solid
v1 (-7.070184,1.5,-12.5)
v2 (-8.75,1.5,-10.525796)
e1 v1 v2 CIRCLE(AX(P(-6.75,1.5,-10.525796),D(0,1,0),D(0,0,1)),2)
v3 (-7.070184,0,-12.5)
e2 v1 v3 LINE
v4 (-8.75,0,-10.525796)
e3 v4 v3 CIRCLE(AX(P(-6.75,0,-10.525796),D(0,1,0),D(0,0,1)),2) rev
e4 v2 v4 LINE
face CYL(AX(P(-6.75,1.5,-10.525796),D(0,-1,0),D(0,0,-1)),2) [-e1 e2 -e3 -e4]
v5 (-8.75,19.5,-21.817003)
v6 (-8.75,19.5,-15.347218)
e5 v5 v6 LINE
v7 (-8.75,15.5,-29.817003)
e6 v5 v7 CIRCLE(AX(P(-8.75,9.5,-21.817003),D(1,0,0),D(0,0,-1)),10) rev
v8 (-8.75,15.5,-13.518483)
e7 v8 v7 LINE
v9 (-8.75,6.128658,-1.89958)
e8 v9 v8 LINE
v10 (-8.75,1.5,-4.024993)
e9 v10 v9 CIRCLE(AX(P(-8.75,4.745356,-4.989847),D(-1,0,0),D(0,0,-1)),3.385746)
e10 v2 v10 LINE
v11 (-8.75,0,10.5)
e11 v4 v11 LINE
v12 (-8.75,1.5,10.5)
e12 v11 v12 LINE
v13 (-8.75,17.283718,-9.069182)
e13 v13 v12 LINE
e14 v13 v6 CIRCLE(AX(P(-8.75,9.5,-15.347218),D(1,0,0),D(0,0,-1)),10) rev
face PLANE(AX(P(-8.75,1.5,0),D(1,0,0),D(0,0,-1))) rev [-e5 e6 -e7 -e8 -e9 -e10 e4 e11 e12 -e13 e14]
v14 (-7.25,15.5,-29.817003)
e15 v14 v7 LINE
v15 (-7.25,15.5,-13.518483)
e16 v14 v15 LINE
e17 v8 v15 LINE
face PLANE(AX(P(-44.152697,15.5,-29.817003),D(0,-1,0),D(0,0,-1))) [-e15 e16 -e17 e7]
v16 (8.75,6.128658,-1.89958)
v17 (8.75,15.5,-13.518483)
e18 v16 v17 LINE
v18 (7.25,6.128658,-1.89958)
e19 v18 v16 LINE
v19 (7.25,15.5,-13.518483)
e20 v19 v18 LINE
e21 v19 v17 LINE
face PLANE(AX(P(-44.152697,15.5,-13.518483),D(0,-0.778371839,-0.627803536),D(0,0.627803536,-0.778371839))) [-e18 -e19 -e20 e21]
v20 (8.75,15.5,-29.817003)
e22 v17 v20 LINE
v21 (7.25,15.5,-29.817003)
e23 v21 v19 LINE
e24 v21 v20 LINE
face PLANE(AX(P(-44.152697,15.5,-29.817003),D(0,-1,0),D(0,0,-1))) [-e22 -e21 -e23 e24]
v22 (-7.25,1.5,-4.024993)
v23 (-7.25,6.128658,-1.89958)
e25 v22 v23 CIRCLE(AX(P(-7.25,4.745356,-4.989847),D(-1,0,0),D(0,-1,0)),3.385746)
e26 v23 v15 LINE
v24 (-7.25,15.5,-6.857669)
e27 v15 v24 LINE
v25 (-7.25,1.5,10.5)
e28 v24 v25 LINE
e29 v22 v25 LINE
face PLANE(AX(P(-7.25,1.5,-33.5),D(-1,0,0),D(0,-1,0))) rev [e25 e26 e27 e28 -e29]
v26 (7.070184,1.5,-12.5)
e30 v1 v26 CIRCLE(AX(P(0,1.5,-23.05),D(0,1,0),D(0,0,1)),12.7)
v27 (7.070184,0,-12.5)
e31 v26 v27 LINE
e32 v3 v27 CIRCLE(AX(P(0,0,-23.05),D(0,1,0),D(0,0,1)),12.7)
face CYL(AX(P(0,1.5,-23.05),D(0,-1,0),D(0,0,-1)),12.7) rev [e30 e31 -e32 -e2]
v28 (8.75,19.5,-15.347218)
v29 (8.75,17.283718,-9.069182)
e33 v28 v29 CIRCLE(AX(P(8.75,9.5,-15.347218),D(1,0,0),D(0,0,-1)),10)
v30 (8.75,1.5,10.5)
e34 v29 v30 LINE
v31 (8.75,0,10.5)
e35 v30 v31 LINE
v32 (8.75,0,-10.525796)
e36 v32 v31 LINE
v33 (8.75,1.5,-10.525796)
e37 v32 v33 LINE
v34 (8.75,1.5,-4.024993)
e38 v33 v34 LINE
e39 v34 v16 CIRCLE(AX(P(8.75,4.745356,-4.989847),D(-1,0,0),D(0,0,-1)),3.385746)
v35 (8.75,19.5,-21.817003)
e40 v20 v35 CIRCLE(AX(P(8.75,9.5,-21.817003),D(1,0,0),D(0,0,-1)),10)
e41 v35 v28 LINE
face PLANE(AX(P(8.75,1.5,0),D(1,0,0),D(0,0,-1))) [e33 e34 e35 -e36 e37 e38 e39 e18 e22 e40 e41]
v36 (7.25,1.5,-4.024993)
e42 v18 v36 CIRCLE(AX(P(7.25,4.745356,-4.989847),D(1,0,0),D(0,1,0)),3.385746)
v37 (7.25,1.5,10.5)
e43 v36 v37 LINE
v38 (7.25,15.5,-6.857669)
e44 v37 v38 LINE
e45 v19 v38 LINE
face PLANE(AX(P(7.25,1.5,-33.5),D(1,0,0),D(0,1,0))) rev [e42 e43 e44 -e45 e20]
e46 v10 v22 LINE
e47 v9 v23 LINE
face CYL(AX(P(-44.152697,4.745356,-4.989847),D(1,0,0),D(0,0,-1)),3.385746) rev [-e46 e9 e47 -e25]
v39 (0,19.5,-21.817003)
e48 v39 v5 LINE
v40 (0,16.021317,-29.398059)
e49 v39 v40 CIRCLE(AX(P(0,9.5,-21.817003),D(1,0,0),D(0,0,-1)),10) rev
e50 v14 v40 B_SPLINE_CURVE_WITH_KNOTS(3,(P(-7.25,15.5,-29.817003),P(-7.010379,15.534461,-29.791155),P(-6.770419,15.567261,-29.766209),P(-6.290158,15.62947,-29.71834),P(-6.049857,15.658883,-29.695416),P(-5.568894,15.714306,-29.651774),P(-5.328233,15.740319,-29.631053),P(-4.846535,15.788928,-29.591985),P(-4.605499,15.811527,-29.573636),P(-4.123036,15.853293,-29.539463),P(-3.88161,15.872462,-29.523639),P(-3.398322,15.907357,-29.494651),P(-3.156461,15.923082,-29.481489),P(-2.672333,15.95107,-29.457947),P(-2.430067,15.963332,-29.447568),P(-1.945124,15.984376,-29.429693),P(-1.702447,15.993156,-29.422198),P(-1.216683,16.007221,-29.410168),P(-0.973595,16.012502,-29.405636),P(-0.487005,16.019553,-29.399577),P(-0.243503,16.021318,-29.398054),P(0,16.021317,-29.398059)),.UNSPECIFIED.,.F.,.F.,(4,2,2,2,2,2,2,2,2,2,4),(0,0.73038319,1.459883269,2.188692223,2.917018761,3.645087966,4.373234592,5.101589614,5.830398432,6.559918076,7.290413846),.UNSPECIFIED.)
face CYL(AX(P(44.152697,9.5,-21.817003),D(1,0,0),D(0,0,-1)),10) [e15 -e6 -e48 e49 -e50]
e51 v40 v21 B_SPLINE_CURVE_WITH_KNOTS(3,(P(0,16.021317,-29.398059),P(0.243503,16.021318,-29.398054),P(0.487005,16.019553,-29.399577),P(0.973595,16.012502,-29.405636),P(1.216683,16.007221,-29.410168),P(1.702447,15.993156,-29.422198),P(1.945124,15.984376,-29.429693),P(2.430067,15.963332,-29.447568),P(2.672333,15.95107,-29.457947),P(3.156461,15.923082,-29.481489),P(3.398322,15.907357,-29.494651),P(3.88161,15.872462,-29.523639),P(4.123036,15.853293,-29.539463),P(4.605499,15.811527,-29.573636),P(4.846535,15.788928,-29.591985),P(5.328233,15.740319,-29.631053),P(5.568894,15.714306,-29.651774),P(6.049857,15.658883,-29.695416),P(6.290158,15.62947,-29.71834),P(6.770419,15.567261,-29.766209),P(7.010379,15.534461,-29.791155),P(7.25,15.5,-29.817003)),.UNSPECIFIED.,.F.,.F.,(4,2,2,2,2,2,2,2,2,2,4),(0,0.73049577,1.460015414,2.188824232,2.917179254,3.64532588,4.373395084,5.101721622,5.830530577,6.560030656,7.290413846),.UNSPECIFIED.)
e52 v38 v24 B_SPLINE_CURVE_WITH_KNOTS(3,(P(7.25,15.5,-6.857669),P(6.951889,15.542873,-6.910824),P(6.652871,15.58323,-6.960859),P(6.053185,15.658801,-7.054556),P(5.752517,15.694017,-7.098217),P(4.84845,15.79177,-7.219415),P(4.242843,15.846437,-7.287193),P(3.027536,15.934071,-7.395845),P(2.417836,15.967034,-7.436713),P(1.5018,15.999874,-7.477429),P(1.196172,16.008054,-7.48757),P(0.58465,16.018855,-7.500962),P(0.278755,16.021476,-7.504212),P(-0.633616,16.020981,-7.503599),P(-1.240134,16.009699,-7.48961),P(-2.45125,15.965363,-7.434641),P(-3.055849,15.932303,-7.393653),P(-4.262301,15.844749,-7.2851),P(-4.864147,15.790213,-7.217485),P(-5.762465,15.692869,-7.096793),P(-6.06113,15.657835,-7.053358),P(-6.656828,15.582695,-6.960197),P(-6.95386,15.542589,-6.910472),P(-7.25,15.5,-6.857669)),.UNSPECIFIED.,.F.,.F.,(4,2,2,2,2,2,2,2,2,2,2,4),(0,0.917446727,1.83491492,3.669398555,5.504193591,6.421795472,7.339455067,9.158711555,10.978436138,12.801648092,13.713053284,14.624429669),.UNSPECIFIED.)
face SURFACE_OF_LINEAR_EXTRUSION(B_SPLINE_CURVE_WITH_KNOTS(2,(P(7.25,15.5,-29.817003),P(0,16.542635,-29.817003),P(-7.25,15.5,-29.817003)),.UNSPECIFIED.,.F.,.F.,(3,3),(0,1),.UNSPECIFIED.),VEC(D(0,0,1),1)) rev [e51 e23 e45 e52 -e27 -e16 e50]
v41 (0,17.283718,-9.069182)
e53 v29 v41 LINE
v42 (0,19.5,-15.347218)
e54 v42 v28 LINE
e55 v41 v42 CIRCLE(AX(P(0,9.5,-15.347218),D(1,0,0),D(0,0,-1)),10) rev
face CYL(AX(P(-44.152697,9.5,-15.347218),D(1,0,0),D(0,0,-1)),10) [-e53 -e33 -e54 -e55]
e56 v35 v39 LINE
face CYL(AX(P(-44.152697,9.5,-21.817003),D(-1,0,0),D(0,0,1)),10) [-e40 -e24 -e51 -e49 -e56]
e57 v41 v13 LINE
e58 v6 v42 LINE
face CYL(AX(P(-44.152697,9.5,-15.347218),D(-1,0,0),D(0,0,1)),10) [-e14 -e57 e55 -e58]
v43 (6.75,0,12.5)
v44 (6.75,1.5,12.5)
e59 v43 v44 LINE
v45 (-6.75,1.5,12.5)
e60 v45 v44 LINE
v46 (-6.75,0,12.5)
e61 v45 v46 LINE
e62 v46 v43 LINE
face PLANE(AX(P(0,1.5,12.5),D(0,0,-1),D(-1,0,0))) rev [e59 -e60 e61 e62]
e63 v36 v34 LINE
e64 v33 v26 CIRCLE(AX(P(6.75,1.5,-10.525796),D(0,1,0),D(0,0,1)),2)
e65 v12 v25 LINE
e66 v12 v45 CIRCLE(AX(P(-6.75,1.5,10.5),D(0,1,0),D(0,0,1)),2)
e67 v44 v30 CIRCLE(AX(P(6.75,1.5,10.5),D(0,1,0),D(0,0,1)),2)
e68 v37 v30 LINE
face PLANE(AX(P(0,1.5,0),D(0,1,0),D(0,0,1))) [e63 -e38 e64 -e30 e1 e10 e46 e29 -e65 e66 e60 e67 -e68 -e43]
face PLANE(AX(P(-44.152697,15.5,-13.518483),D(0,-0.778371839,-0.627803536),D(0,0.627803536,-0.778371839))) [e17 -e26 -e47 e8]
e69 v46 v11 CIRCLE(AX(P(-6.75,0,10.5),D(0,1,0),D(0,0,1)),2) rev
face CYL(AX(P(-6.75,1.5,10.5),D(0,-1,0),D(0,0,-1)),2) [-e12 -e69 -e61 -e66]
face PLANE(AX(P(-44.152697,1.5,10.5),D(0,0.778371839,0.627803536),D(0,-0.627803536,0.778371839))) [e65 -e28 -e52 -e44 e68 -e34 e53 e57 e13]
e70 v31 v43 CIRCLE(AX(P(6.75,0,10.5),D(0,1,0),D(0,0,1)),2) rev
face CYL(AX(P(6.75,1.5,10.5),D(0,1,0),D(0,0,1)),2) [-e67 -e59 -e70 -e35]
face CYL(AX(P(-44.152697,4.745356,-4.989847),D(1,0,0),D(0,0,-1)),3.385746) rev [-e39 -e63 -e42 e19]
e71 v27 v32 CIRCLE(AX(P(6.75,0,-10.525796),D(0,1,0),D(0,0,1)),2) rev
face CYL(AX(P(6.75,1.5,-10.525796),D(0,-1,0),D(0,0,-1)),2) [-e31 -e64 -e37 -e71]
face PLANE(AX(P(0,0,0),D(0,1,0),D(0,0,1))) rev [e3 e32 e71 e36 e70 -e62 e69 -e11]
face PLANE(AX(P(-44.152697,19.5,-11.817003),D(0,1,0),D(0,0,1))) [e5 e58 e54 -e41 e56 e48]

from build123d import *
from build123d.topology import SkipClean

# Parameters (mm, degrees)
BOSS_EXTRUDE4_DEPTH    = 1.5
FILLET1_R              = 2
BOSS_EXTRUDE5_DEPTH    = 8.75
FILLET4_R              = 10
FILLET5_R              = 10
FILLET4_OF_MIRROR2_R   = 10
FILLET5_OF_MIRROR2_R   = 10
CUT_EXTRUDE2_START     = -26.018483
CUT_EXTRUDE2_OUTLINE_W = 14.5
CUT_EXTRUDE2_OUTLINE_H = 14
CUT_EXTRUDE2_DEPTH     = 24.018483
CUT_EXTRUDE3_DEPTH     = 48.40824


# Read off the part's stored shape, not the designer's step: Cut-Extrude2
with BuildPart() as part:
    # Sketch1 → Boss-Extrude4 (new body)
    with BuildSketch(Plane(origin=(0, 0, 0), x_dir=(1, 0, 0), z_dir=(0, 1, 0))):
        with BuildLine():
            Line((-7.070184, 12.5), (-8.75, 12.5))
            Line((-8.75, 12.5), (-8.75, -12.5))
            Line((-8.75, -12.5), (8.75, -12.5))
            Line((8.75, -12.5), (8.75, 12.5))
            Line((8.75, 12.5), (7.070184, 12.5))
            ThreePointArc((7.070184, 12.5), (0, 10.35), (-7.070184, 12.5))
        make_face()
    extrude(amount=BOSS_EXTRUDE4_DEPTH)

    # Fillet1
    # the kernel refuses this fillet: 2 mm, written as the material it takes off along each edge
    with BuildSketch(Plane(origin=(-8.75, -4.935511, -12.5), x_dir=(1, 0, 0), z_dir=(0, 1, 0))) as fillet1_piece_1:
        with BuildLine():
            CenterArc((2, -1.974204), FILLET1_R, 99.212233, 80.787767)
            Line((0, -1.974204), (-0.04, -1.974204))
            Line((-0.04, -1.974204), (-0.04, 0))
            Line((-0.04, 0), (0, 0.04))
            ThreePointArc((0, 0.04), (0.839908, 0.04), (1.673412, 0.039484))
            Line((1.673412, 0.039484), (1.679816, 0))
        make_face()
    extrude(amount=11.371021, mode=Mode.SUBTRACT)
    with BuildSketch(Plane(origin=(8.75, -4.935511, -12.5), x_dir=(0, 0, 1), z_dir=(0, 1, 0))) as fillet1_piece_2:
        with BuildLine():
            CenterArc((1.974204, -2), FILLET1_R, 90, 80.787767)
            Line((0, -1.679816), (-0.039484, -1.673412))
            ThreePointArc((-0.039484, -1.673412), (-0.04, -0.839908), (-0.04, 0))
            Line((-0.04, 0), (0, 0.04))
            Line((0, 0.04), (1.974204, 0.04))
            Line((1.974204, 0.04), (1.974204, 0))
        make_face()
    extrude(amount=11.371021, mode=Mode.SUBTRACT)
    with BuildSketch(Plane(origin=(-8.75, -5, 12.5), x_dir=(0, 0, -1), z_dir=(0, 1, 0)), Plane(origin=(8.75, -5, 12.5), x_dir=(-1, 0, 0), z_dir=(0, 1, 0))) as fillet1_piece_3:
        with BuildLine():
            CenterArc((FILLET1_R, -FILLET1_R), FILLET1_R, 90, 90)
            Line((0, -FILLET1_R), (-FILLET1_R * 0.02, -FILLET1_R))
            Line((-FILLET1_R * 0.02, -FILLET1_R), (-FILLET1_R * 0.02, FILLET1_R * 0.02))
            Line((-FILLET1_R * 0.02, FILLET1_R * 0.02), (FILLET1_R, FILLET1_R * 0.02))
            Line((FILLET1_R, FILLET1_R * 0.02), (FILLET1_R, 0))
        make_face()
    extrude(amount=11.5, mode=Mode.SUBTRACT)

    # Sketch2 → Boss-Extrude5 (add)
    with BuildSketch(Plane(origin=(8.75, 0, 0), x_dir=(0, 0, -1), z_dir=(1, 0, 0))):
        with BuildLine():
            Line((-10.5, 1.5), (11.817003, 19.5))
            Line((11.817003, 19.5), (29.817003, 19.5))
            Line((29.817003, 19.5), (29.817003, 15.5))
            Line((29.817003, 15.5), (13.518483, 15.5))
            Line((13.518483, 15.5), (1.89958, 6.128658))
            ThreePointArc((1.89958, 6.128658), (1.912979, 3.332502), (4.024993, 1.5))
            Line((4.024993, 1.5), (-1.921972, 1.5))
            Line((-1.921972, 1.5), (-10.5, 1.5))
        make_face()
    boss_extrude5 = extrude(amount=-BOSS_EXTRUDE5_DEPTH)

    # Fillet4
    # the kernel refuses this fillet: 10 mm, written as the material it takes off along each edge
    with BuildSketch(Plane(origin=(28.75, 19.5, -29.817003), x_dir=(0, 0, 1), z_dir=(-1, 0, 0))) as fillet4_piece_1:
        with BuildLine():
            CenterArc((8, -10), FILLET4_R, 90, 53.130102)
            Line((0, -4), (-0.16, -3.88))
            ThreePointArc((-0.16, -3.88), (-0.2, -2), (-0.2, 0))
            Line((-0.2, 0), (0, 0.2))
            Line((0, 0.2), (8, 0.2))
            Line((8, 0.2), (8, 0))
        make_face()
    extrude(amount=48.75, mode=Mode.SUBTRACT)

    # Fillet5
    fillet5_edges = [part.edges().sort_by_distance(p)[0] for p in [
        (4.375, 19.5, -11.817003),
    ]]
    fillet(fillet5_edges, radius=FILLET5_R)

    # Mirror2: Boss-Extrude5 across plane
    add(boss_extrude5.mirror(Plane(origin=(0, 0, 0), x_dir=(0, 0, 1), z_dir=(1, 0, 0))))

    # Fillet4 of Mirror2
    # the kernel refuses this fillet: 10 mm, written as the material it takes off along each edge
    with BuildSketch(Plane(origin=(-28.75, 19.5, -29.817003), x_dir=(0, -1, 0), z_dir=(1, 0, 0))) as fillet4_of_mirror2_piece_1:
        with BuildLine():
            CenterArc((10, -8), FILLET4_OF_MIRROR2_R, 126.869898, 53.130102)
            Line((0, -8), (-0.2, -8))
            Line((-0.2, -8), (-0.2, 0))
            Line((-0.2, 0), (0, 0.2))
            ThreePointArc((0, 0.2), (2, 0.2), (3.88, 0.16))
            Line((3.88, 0.16), (4, 0))
        make_face()
    extrude(amount=48.75, mode=Mode.SUBTRACT)

    # Fillet5 of Mirror2
    fillet5_of_mirror2_edges = [part.edges().sort_by_distance(p)[0] for p in [
        (-4.375, 19.5, -11.817003),
    ]]
    fillet(fillet5_of_mirror2_edges, radius=FILLET5_OF_MIRROR2_R)

    # Cut-Extrude2 outline → Cut-Extrude2 (cut)
    with SkipClean():  # the faces are left unmerged after this step: merging them gives an invalid solid
        with BuildSketch(Plane.XY.offset(12.5).offset(CUT_EXTRUDE2_START)):
            with Locations((0, 8.5)):
                Rectangle(CUT_EXTRUDE2_OUTLINE_W, CUT_EXTRUDE2_OUTLINE_H)
        extrude(amount=CUT_EXTRUDE2_DEPTH, mode=Mode.SUBTRACT)

    # Sketch5 → Cut-Extrude3 (cut, through all)
    with SkipClean():  # the faces are left unmerged after this step: merging them gives an invalid solid
        with BuildSketch(Plane.XY.offset(12.5)):
            with BuildLine():
                Line((-7.25, 15.5), (7.25, 15.5))
                add(Edge.make_bspline(
                    [(7.25, 15.5), (0, 16.542635), (-7.25, 15.5)],
                    knots=[0, 0, 0, 1, 1, 1], degree=2))
            make_face()
        extrude(amount=-CUT_EXTRUDE3_DEPTH, mode=Mode.SUBTRACT)


solid = part.part
